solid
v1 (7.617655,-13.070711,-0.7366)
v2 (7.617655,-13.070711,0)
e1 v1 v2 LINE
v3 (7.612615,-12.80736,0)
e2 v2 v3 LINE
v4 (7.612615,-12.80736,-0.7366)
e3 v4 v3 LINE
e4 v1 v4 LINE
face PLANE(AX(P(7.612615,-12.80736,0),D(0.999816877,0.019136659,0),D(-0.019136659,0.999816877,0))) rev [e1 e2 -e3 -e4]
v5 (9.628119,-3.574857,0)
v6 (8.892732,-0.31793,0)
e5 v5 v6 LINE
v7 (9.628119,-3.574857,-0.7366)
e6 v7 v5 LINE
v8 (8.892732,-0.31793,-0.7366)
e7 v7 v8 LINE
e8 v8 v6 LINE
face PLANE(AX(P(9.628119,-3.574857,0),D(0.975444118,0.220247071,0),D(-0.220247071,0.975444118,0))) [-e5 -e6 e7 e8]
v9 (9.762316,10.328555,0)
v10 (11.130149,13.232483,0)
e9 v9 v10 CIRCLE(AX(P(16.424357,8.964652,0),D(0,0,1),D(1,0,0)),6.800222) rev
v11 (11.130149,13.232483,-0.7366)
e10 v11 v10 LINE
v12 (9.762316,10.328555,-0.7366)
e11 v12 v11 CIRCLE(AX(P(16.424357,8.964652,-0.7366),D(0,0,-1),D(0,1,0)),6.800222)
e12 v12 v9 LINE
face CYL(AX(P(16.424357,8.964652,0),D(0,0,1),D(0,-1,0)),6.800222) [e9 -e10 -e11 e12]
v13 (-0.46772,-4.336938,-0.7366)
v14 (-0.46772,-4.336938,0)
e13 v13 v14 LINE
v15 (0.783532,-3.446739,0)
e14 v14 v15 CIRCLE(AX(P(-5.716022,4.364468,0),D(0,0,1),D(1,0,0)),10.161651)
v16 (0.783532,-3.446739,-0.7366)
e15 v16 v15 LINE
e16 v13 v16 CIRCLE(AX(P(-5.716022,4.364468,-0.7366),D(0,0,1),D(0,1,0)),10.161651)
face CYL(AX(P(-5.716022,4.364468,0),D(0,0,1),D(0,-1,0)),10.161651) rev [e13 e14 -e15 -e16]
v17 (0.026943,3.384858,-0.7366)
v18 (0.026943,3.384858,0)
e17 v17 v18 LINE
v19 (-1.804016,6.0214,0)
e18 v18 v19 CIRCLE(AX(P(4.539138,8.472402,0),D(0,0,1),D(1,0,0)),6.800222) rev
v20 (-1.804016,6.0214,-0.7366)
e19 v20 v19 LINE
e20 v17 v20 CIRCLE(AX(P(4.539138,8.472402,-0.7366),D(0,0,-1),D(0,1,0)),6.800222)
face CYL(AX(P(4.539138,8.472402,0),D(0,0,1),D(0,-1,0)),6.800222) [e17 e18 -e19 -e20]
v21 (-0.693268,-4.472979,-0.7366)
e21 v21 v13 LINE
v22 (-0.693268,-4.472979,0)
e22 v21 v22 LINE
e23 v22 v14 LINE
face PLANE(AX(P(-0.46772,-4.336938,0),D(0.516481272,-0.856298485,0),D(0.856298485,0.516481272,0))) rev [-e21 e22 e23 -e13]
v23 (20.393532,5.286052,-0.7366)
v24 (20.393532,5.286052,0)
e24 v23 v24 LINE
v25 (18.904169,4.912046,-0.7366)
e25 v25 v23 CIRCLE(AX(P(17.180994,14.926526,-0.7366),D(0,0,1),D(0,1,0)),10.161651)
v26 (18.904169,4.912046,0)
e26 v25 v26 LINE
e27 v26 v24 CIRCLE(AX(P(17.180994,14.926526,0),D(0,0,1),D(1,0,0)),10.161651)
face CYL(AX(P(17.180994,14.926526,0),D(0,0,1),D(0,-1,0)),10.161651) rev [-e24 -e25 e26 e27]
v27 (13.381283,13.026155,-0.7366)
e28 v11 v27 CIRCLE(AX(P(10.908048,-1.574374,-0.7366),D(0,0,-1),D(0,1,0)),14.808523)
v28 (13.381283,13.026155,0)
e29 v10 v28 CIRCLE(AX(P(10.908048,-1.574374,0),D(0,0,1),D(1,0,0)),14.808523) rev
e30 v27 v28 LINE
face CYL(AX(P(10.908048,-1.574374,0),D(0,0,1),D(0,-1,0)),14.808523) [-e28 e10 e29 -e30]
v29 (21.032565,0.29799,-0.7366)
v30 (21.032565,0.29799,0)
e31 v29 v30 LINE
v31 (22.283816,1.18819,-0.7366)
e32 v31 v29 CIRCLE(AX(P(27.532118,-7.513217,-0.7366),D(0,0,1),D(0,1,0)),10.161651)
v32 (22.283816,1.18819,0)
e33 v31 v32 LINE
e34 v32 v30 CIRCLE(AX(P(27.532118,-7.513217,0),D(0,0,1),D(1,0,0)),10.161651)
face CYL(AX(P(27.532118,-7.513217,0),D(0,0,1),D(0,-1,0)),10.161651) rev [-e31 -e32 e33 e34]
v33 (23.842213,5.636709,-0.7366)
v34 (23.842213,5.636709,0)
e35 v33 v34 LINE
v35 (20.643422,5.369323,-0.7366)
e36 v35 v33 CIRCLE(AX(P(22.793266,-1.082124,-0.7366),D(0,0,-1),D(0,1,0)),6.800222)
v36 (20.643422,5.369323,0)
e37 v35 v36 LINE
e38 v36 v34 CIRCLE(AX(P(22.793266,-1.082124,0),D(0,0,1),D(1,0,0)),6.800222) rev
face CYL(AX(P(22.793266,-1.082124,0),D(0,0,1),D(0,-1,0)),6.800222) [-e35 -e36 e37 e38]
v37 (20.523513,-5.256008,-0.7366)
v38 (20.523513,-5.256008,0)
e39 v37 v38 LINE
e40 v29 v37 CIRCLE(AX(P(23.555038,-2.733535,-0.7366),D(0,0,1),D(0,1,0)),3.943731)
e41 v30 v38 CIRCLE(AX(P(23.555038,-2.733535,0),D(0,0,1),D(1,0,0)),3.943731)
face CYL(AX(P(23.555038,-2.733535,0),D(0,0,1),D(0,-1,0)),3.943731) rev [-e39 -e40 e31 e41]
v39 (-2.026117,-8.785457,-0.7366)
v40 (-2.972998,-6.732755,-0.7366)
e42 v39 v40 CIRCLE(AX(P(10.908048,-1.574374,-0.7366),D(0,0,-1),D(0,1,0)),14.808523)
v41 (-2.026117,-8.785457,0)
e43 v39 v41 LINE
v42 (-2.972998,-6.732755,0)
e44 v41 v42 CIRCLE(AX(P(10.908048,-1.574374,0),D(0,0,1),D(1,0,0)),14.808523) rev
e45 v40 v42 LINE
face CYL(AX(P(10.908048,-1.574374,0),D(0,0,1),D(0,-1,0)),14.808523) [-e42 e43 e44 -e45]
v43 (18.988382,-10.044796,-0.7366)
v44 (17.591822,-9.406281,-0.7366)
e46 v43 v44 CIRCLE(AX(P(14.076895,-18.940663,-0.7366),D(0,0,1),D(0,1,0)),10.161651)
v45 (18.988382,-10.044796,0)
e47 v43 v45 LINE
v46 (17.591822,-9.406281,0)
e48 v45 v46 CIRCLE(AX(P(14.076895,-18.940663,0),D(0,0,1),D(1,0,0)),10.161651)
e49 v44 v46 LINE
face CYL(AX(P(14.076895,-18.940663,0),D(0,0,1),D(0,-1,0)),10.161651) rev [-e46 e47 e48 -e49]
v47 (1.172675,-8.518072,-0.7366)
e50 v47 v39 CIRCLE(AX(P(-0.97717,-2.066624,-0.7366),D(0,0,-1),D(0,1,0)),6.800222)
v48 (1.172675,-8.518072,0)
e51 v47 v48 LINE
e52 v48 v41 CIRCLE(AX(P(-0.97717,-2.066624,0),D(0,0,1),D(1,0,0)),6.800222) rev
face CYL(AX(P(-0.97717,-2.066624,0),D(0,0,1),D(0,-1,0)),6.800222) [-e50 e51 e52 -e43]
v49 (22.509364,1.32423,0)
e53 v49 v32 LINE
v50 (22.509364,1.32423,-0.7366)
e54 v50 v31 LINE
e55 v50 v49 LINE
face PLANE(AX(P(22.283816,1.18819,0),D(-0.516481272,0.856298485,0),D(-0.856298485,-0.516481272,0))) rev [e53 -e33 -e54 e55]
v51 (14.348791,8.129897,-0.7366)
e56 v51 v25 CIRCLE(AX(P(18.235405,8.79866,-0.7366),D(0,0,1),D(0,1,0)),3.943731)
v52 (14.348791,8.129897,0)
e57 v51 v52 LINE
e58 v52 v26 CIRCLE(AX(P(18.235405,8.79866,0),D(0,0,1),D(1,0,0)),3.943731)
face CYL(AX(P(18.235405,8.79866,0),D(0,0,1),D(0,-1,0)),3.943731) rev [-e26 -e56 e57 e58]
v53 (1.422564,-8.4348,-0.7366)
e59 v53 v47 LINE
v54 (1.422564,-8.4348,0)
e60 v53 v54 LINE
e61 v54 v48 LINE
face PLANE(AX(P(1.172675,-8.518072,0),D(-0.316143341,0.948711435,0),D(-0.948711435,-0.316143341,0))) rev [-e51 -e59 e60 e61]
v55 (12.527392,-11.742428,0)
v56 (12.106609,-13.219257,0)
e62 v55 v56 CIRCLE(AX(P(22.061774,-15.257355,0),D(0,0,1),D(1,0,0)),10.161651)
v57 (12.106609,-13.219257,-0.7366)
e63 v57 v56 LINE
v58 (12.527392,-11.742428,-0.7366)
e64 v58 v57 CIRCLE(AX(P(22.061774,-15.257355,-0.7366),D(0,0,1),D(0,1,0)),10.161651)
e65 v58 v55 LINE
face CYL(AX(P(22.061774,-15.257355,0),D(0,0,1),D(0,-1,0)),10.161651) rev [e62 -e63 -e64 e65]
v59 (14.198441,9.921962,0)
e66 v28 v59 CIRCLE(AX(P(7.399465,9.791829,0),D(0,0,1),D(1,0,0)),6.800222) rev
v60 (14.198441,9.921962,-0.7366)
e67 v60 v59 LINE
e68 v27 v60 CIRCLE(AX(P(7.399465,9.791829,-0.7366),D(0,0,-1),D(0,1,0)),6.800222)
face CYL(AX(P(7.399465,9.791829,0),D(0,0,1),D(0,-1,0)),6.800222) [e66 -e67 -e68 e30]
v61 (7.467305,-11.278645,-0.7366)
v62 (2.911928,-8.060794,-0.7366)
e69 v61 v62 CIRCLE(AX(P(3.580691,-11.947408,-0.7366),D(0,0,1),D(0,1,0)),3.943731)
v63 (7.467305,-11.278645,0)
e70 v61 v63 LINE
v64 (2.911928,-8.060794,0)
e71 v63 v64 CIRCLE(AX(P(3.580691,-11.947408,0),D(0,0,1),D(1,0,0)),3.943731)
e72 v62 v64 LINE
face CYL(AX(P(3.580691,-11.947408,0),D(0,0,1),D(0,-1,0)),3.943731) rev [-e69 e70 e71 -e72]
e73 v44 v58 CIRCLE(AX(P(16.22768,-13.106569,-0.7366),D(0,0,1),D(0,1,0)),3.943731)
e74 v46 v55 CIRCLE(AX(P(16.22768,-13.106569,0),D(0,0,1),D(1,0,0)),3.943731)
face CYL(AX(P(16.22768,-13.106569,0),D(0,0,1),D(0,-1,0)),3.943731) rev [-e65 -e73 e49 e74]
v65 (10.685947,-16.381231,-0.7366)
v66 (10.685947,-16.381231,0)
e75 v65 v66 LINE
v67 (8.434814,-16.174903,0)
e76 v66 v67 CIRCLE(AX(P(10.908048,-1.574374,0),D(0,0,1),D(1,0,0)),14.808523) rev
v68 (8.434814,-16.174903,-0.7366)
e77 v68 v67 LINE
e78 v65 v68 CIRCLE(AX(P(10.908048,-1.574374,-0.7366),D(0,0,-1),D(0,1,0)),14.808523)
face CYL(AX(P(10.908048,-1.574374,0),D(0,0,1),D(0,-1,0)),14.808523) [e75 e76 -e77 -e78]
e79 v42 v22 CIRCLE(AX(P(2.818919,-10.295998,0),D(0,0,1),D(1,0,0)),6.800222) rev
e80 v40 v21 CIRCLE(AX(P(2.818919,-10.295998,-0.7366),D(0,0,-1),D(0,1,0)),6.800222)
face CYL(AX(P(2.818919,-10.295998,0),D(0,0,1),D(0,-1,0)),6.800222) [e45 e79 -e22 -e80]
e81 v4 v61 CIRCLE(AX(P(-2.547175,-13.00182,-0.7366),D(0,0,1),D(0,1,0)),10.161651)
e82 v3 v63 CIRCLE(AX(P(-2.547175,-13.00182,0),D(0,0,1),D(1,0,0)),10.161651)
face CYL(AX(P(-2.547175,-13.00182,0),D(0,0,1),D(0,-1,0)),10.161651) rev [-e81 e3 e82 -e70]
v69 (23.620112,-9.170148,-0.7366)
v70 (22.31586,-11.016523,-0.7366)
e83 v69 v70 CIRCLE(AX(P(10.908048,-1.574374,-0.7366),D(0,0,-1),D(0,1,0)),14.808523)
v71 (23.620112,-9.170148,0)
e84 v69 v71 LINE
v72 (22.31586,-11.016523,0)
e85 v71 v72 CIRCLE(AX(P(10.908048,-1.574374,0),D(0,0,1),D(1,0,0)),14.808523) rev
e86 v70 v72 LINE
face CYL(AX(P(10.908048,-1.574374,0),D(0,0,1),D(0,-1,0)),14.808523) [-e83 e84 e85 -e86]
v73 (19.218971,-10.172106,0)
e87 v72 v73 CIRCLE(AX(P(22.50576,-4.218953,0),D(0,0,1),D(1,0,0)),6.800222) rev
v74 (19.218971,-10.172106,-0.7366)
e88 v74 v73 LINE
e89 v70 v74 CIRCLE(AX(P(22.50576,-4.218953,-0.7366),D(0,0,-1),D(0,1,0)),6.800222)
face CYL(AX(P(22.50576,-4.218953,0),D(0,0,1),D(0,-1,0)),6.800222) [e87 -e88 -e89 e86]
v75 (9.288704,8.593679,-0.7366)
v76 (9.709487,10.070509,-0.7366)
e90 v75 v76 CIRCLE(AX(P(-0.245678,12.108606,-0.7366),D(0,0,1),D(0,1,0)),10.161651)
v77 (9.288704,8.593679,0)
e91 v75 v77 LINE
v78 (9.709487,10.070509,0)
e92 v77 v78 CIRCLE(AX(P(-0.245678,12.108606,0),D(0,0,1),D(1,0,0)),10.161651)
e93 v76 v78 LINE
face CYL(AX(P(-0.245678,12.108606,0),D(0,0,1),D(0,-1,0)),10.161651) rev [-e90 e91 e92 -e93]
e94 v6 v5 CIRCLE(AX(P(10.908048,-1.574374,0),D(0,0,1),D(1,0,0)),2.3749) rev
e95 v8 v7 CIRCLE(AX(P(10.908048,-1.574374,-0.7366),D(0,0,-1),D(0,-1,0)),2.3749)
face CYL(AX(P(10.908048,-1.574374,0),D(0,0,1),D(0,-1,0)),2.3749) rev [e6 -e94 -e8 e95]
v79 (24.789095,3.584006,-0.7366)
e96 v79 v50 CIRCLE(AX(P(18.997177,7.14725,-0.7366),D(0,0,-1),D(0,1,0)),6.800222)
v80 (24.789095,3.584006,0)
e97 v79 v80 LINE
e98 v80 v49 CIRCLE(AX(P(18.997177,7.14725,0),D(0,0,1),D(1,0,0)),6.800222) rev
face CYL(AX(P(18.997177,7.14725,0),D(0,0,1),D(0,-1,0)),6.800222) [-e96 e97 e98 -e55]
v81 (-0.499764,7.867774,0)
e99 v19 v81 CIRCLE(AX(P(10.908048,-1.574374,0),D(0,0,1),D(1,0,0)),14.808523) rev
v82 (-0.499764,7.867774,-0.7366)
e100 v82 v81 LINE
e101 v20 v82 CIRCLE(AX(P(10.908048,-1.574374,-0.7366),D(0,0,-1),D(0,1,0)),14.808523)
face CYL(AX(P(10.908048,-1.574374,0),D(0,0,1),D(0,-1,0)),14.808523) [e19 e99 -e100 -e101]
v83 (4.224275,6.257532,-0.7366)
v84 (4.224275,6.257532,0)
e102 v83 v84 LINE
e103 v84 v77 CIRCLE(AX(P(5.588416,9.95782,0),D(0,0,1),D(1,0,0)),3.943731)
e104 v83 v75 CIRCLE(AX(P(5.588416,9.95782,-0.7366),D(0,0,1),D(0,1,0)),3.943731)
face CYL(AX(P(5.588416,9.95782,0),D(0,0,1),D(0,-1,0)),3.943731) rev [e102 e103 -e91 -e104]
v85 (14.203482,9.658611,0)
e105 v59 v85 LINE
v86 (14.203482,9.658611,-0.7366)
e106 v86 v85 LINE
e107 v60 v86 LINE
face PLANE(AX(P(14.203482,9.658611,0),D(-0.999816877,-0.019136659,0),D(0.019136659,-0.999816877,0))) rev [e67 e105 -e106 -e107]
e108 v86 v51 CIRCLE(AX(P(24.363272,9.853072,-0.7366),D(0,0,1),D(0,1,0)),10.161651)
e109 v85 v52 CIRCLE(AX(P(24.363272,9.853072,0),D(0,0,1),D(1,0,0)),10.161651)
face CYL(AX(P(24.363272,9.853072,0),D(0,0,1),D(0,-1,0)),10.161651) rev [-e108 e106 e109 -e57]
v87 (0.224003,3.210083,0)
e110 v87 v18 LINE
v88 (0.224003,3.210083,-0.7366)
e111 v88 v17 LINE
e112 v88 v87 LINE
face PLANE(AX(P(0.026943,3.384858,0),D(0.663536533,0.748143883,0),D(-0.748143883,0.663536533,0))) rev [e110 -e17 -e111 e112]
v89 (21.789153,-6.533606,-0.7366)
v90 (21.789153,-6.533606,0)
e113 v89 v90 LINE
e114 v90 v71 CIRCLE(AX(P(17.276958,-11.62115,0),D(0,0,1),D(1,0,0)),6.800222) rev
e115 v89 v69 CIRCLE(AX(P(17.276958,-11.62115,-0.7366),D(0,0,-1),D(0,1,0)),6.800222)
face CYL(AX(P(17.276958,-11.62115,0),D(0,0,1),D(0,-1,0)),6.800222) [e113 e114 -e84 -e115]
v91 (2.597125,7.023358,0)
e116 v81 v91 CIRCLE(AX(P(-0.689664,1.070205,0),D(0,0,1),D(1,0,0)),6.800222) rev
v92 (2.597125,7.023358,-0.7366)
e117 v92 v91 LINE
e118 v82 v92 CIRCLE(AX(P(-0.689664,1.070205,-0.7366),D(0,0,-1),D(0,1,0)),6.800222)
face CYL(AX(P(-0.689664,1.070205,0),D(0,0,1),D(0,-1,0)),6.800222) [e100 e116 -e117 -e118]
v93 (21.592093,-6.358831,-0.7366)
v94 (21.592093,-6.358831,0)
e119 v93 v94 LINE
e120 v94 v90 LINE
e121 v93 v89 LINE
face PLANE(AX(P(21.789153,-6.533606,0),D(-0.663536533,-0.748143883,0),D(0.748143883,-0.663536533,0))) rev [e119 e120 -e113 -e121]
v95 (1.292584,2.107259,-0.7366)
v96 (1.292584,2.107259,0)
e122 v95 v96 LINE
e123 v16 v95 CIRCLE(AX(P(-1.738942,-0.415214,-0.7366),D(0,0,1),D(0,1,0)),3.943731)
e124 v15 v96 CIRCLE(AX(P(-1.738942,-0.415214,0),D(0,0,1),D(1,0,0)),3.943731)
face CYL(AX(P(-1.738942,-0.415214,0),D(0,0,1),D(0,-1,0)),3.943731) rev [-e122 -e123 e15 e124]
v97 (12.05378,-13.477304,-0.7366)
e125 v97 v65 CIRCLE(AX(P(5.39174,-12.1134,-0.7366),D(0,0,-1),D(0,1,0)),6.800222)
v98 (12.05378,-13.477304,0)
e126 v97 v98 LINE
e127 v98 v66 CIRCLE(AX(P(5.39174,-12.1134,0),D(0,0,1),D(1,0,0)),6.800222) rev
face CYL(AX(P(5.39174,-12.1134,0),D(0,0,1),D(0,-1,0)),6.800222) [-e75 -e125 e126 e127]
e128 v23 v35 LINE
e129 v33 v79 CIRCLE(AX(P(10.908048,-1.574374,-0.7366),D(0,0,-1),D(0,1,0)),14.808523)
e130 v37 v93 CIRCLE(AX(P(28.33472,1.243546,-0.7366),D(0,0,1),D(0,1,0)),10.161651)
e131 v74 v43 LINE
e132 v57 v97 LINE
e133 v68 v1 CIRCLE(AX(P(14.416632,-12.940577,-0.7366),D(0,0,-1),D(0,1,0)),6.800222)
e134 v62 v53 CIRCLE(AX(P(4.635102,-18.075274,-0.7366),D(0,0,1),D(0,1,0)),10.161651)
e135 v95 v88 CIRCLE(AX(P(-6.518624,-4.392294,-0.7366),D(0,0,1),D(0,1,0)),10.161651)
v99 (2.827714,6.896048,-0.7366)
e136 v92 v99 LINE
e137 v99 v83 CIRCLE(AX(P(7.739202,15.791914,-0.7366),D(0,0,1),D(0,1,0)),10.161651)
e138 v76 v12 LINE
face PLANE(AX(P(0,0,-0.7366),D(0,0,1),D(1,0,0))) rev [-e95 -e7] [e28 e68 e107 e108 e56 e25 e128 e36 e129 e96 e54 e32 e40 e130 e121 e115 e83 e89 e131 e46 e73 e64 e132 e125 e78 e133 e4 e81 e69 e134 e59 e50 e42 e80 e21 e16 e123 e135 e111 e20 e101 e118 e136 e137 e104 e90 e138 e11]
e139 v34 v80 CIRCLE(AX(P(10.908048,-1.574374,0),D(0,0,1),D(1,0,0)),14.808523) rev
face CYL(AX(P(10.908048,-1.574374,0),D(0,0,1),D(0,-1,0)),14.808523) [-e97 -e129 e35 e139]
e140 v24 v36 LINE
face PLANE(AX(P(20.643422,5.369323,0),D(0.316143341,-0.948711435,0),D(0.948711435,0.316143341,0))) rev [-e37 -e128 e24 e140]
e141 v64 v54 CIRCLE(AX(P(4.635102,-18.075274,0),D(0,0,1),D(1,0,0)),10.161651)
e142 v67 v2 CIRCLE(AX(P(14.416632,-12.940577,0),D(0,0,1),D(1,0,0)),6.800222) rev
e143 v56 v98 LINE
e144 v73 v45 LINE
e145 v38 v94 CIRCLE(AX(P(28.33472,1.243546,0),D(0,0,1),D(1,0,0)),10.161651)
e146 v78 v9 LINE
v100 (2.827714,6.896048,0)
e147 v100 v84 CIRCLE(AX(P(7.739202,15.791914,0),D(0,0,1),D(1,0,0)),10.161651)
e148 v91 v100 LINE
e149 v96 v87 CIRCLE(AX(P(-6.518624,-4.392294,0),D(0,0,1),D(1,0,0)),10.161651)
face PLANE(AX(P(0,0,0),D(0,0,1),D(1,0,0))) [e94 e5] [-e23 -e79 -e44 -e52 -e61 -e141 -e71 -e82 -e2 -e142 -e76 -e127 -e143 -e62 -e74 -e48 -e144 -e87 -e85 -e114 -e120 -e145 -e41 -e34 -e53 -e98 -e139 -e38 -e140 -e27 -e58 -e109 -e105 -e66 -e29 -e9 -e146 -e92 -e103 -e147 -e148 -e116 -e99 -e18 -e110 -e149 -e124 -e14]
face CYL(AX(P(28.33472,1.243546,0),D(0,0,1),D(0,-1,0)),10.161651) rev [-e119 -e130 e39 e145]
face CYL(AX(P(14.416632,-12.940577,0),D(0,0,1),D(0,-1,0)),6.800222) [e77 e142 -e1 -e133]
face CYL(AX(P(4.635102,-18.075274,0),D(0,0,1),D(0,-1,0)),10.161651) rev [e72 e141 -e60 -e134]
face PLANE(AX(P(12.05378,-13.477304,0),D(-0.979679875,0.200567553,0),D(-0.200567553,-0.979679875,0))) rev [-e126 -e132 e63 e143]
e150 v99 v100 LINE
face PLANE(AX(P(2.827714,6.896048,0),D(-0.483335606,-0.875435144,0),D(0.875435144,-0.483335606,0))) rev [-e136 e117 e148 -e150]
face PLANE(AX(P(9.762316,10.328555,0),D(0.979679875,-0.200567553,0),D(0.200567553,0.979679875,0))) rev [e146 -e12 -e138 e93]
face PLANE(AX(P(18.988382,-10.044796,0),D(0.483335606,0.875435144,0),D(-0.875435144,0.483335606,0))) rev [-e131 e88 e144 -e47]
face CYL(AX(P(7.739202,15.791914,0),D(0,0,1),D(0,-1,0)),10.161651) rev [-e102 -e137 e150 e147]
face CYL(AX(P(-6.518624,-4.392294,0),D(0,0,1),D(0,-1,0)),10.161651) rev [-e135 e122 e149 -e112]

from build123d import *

# Parameters (mm, degrees)
SKETCH1_R               = 34.867744869
BASE_FLANGE1_DEPTH      = 0.7366
CUT_EXTRUDE1_DEPTH      = 166.090690723
CUT_EXTRUDE1_DEPTH_BACK = 166.090690723
SKETCH2_R               = 180.553154812
CUT_EXTRUDE2_DEPTH      = 143.907778027
CUT_EXTRUDE2_DEPTH_BACK = 143.907778027


# Sheet-metal steps are written as plain solids
with BuildPart() as part:
    # Sketch1 → Base-Flange1 (new body)
    with BuildSketch(Plane.XY):
        Circle(SKETCH1_R)
    extrude(amount=-BASE_FLANGE1_DEPTH)

    # Sketch2 → Cut-Extrude1 (cut, two sides: drawn at the far end of the back side and taken through both)
    with BuildSketch(Plane(origin=(-59.555266985, -54.618905297, 100.906749206), x_dir=(-1, 0, 0), z_dir=(0, 0, -1)).offset(-CUT_EXTRUDE1_DEPTH_BACK)):
        with Locations((-70.46331512, 53.044531114)):
            Circle(SKETCH2_R)
        with BuildLine():
            Line((-81.344420416, 48.08529911), (-81.147360116, 48.260073924))
            ThreePointArc((-81.147360116, 48.260073924), (-80.592208079, 48.791271643), (-80.078779721, 49.362897501))
            ThreePointArc((-80.078779721, 49.362897501), (-79.183035074, 52.245324657), (-80.587831747, 54.91689556))
            ThreePointArc((-80.587831747, 54.91689556), (-81.196617582, 55.385664809), (-81.839082773, 55.807094848))
            Line((-81.839082773, 55.807094848), (-82.06463088, 55.943135463))
            ThreePointArc((-82.06463088, 55.943135463), (-83.339743584, 56.936582022), (-84.344361609, 58.202911795))
            ThreePointArc((-84.344361609, 58.202911795), (-83.910146998, 59.247357512), (-83.397480034, 60.255614309))
            ThreePointArc((-83.397480034, 60.255614309), (-81.782081355, 60.31336879), (-80.198688666, 59.98822872))
            Line((-80.198688666, 59.98822872), (-79.948799088, 59.904956901))
            ThreePointArc((-79.948799088, 59.904956901), (-79.21119235, 59.689779993), (-78.459435657, 59.530950921))
            ThreePointArc((-78.459435657, 59.530950921), (-75.515308192, 60.196426879), (-73.904058259, 62.748801937))
            ThreePointArc((-73.904058259, 62.748801937), (-73.802485098, 63.51041056), (-73.758748573, 64.277516756))
            Line((-73.758748573, 64.277516756), (-73.753707998, 64.540867454))
            ThreePointArc((-73.753707998, 64.540867454), (-73.530914393, 66.141870727), (-72.936549652, 67.645060345))
            ThreePointArc((-72.936549652, 67.645060345), (-71.814925823, 67.79124232), (-70.685416342, 67.851388104))
            ThreePointArc((-70.685416342, 67.851388104), (-69.827700155, 66.481289051), (-69.317583371, 64.947460723))
            Line((-69.317583371, 64.947460723), (-69.264754091, 64.689414091))
            ThreePointArc((-69.264754091, 64.689414091), (-69.082299391, 63.943039464), (-68.843971056, 63.212584534))
            ThreePointArc((-68.843971056, 63.212584534), (-66.795588238, 60.995633336), (-63.779541631, 60.876437491))
            ThreePointArc((-63.779541631, 60.876437491), (-63.069182636, 61.169276865), (-62.38298092, 61.514953022))
            Line((-62.38298092, 61.514953022), (-62.152392238, 61.642263104))
            ThreePointArc((-62.152392238, 61.642263104), (-60.654485929, 62.249819819), (-59.055503163, 62.486679664))
            ThreePointArc((-59.055503163, 62.486679664), (-58.368093945, 61.588415921), (-57.751251427, 60.640304909))
            ThreePointArc((-57.751251427, 60.640304909), (-58.508933919, 59.212451375), (-59.582209824, 58.003763118))
            Line((-59.582209824, 58.003763118), (-59.779270124, 57.828988304))
            ThreePointArc((-59.779270124, 57.828988304), (-60.334422161, 57.297790585), (-60.847850519, 56.726164727))
            ThreePointArc((-60.847850519, 56.726164727), (-61.743595166, 53.843737571), (-60.338798493, 51.172166668))
            ThreePointArc((-60.338798493, 51.172166668), (-59.730012659, 50.703397419), (-59.087547467, 50.28196738))
            Line((-59.087547467, 50.28196738), (-58.861999361, 50.145926765))
            ThreePointArc((-58.861999361, 50.145926765), (-57.586886657, 49.152480206), (-56.582268631, 47.886150433))
            ThreePointArc((-56.582268631, 47.886150433), (-57.016483242, 46.841704716), (-57.529150206, 45.833447919))
            ThreePointArc((-57.529150206, 45.833447919), (-59.144548885, 45.775693438), (-60.727941574, 46.100833508))
            Line((-60.727941574, 46.100833508), (-60.977831152, 46.184105327))
            ThreePointArc((-60.977831152, 46.184105327), (-61.71543789, 46.399282235), (-62.467194583, 46.558111307))
            ThreePointArc((-62.467194583, 46.558111307), (-65.411322049, 45.892635349), (-67.022571982, 43.340260291))
            ThreePointArc((-67.022571982, 43.340260291), (-67.124145142, 42.578651669), (-67.167881667, 41.811545472))
            Line((-67.167881667, 41.811545472), (-67.172922242, 41.548194774))
            ThreePointArc((-67.172922242, 41.548194774), (-67.395715847, 39.947191501), (-67.990080588, 38.444001883))
            ThreePointArc((-67.990080588, 38.444001883), (-69.111704417, 38.297819908), (-70.241213899, 38.237674124))
            ThreePointArc((-70.241213899, 38.237674124), (-71.098930085, 39.607773177), (-71.60904687, 41.141601505))
            Line((-71.60904687, 41.141601505), (-71.661876149, 41.399648137))
            ThreePointArc((-71.661876149, 41.399648137), (-71.844330849, 42.146022764), (-72.082659185, 42.876477694))
            ThreePointArc((-72.082659185, 42.876477694), (-74.131042002, 45.093428892), (-77.147088609, 45.212624737))
            ThreePointArc((-77.147088609, 45.212624737), (-77.857447604, 44.919785363), (-78.54364932, 44.574109206))
            Line((-78.54364932, 44.574109206), (-78.774238002, 44.446799124))
            ThreePointArc((-78.774238002, 44.446799124), (-80.272144311, 43.839242409), (-81.871127077, 43.602382564))
            ThreePointArc((-81.871127077, 43.602382564), (-82.558536295, 44.500646307), (-83.175378813, 45.448757319))
            ThreePointArc((-83.175378813, 45.448757319), (-82.417696321, 46.876610853), (-81.344420416, 48.08529911))
        make_face(mode=Mode.SUBTRACT)
    extrude(amount=CUT_EXTRUDE1_DEPTH + CUT_EXTRUDE1_DEPTH_BACK, mode=Mode.SUBTRACT)

    # Sketch3 → Cut-Extrude2 (cut, two sides: drawn at the far end of the back side and taken through both)
    with BuildSketch(Plane(origin=(-59.555266985, -54.618905297, 92.56319002), x_dir=(-1, 0, 0), z_dir=(0, 0, -1)).offset(-CUT_EXTRUDE2_DEPTH_BACK)):
        with BuildLine():
            Line((-69.183385772, 51.044048454), (-68.447999148, 54.300975121))
            ThreePointArc((-68.447999148, 54.300975121), (-72.779897357, 53.567595882), (-69.183385772, 51.044048454))
        make_face()
    extrude(amount=CUT_EXTRUDE2_DEPTH + CUT_EXTRUDE2_DEPTH_BACK, mode=Mode.SUBTRACT)


solid = part.part
